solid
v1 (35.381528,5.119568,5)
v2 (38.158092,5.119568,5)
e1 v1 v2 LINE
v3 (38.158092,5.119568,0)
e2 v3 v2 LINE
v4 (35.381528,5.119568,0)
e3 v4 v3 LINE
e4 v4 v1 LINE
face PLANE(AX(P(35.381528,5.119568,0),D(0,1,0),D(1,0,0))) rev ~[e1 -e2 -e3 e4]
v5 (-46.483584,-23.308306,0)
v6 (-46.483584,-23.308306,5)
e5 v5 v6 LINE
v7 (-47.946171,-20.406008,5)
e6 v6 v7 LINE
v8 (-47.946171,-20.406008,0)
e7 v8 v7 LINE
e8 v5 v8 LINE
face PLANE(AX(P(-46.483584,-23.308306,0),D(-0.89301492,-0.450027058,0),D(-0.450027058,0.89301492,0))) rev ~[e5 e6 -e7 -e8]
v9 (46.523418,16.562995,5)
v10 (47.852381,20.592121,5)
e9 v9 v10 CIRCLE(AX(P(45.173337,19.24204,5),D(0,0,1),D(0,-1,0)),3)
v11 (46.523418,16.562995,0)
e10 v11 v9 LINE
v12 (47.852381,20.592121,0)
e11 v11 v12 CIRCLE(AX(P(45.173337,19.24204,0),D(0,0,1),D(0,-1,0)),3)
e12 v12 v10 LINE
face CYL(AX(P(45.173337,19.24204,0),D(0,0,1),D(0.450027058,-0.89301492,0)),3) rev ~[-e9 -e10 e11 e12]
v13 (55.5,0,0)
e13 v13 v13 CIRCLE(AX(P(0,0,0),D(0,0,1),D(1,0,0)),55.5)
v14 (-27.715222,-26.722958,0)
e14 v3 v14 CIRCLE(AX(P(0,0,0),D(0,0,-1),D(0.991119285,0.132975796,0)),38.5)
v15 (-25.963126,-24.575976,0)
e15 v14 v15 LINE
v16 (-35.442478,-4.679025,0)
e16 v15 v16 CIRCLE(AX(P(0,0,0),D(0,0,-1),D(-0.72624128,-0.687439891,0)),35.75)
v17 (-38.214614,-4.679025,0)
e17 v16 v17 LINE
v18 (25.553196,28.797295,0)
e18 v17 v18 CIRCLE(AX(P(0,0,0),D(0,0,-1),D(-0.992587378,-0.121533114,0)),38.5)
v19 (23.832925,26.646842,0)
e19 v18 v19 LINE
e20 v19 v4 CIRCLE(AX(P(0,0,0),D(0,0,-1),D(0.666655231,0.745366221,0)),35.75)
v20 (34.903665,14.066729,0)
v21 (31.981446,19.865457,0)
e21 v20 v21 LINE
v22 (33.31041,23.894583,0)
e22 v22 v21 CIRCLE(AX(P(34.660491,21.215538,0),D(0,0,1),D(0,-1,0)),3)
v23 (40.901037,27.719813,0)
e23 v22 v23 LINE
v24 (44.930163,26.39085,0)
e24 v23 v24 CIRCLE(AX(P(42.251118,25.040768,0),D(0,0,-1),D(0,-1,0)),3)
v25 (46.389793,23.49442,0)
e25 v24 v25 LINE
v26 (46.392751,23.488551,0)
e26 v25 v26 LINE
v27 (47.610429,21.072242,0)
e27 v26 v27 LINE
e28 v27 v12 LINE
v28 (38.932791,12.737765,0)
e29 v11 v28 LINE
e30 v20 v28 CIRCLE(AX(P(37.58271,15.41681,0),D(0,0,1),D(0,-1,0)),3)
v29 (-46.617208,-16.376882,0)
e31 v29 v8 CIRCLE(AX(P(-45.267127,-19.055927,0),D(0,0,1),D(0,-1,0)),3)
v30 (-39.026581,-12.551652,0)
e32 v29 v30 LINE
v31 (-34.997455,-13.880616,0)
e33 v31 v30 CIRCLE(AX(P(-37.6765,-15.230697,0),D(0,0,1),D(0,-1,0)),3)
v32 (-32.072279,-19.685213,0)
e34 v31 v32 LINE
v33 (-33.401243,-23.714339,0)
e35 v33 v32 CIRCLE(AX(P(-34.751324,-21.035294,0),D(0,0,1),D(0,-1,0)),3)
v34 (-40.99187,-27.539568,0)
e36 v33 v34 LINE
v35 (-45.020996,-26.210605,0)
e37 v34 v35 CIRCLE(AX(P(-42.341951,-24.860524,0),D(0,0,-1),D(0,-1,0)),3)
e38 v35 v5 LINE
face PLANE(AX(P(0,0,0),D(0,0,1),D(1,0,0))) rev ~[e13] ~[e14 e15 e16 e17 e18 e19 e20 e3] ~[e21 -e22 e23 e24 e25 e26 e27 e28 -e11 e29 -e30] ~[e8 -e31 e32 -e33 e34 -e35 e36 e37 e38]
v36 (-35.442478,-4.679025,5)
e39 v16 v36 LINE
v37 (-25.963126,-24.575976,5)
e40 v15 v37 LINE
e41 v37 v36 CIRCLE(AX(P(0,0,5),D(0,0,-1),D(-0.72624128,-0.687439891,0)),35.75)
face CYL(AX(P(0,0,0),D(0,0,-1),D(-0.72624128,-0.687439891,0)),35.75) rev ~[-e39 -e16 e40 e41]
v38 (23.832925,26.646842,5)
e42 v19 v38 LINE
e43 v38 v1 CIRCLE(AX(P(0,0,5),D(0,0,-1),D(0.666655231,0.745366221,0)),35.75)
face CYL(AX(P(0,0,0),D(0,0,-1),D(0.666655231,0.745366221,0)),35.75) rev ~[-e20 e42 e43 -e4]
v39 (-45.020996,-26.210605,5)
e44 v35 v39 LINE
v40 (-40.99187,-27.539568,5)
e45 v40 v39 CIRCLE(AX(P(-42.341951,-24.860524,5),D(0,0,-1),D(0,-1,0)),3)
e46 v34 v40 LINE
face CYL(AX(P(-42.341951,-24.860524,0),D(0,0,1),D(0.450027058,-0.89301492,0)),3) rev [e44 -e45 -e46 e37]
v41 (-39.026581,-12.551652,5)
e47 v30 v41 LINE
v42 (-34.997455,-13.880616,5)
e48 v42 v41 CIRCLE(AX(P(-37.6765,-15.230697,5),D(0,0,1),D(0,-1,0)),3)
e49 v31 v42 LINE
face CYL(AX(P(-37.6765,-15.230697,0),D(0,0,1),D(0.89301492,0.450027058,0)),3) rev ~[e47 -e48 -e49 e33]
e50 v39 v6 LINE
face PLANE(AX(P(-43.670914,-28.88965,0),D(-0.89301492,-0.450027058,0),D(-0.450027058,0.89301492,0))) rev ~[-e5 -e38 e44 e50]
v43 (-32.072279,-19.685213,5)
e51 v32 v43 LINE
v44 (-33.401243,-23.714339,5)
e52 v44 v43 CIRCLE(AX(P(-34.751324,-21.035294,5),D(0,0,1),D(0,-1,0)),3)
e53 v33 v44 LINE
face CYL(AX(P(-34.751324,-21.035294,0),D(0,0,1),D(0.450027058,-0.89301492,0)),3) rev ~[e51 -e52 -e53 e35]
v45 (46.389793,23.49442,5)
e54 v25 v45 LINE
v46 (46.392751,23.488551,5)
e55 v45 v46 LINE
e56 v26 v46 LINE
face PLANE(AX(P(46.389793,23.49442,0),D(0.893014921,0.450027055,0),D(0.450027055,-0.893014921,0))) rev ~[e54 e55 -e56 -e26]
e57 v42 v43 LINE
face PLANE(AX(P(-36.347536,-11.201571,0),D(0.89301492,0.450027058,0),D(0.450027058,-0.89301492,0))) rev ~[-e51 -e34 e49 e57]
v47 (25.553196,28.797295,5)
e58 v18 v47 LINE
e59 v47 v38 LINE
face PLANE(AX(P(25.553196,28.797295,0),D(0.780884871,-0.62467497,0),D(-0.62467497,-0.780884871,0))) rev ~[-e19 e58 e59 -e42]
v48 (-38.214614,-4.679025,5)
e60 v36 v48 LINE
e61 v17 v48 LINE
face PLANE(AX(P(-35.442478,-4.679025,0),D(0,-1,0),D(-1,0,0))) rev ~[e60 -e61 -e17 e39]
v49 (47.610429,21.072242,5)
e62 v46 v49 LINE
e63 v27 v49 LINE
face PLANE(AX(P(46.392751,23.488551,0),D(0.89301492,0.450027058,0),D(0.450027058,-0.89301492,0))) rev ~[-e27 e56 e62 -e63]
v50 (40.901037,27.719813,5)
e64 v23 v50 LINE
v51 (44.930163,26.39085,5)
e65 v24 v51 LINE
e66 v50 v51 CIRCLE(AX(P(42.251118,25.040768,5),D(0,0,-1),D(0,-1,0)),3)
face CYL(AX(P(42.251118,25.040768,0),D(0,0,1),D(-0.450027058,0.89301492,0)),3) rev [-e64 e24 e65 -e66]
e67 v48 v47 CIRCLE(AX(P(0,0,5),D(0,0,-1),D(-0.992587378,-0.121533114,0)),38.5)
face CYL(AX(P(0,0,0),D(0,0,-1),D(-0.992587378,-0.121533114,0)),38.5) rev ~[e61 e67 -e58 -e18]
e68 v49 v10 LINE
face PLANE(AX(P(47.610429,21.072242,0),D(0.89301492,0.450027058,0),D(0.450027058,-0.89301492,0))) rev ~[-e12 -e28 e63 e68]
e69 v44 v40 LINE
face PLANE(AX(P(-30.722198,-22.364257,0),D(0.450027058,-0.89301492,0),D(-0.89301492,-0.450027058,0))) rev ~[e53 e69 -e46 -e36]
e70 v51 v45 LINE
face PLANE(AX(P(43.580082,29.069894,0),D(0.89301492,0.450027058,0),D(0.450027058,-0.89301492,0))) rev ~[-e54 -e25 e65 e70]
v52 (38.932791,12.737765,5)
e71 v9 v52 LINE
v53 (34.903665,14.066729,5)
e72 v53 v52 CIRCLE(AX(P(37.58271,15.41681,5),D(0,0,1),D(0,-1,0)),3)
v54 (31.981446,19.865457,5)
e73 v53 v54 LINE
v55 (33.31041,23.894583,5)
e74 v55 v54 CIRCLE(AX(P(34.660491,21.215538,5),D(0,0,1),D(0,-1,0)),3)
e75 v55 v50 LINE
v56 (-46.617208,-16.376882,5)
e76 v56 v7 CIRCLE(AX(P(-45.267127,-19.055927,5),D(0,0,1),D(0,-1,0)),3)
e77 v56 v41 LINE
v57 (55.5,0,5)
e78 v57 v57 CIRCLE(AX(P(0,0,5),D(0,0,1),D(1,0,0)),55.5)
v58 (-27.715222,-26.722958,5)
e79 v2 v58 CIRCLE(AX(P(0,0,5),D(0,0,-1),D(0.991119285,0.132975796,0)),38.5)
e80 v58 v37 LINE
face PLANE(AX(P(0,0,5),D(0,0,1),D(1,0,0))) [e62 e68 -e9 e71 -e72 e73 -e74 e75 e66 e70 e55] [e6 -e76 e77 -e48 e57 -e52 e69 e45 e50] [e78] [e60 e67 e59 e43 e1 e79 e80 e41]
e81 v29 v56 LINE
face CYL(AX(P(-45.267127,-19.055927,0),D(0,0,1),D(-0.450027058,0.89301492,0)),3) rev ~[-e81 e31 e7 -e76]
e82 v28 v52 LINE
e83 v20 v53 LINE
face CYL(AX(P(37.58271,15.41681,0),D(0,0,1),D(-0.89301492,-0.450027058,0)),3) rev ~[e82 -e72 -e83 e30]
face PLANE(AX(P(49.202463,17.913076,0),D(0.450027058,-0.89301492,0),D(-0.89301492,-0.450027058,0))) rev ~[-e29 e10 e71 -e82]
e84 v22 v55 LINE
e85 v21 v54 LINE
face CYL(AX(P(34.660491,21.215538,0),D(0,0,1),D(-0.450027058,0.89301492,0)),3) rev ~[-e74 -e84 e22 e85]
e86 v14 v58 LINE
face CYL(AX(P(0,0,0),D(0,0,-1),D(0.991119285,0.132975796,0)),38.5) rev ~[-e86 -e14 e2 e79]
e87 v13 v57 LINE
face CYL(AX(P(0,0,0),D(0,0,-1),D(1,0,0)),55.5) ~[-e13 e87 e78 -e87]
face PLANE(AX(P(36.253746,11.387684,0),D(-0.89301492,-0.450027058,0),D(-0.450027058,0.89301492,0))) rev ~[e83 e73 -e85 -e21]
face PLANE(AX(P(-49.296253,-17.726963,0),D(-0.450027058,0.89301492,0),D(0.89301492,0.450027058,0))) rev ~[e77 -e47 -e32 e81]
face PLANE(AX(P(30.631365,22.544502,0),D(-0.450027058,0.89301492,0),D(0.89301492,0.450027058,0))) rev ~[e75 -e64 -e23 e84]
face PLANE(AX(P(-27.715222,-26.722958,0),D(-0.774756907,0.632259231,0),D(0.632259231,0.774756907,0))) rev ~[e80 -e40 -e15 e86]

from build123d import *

# Parameters (mm, degrees)
F0_R     = 55.5
F1_DEPTH = 5
F2_R     = 3


with BuildPart() as f1:
    # F0 (on Top) → F1 (new body)
    with BuildSketch(Plane.XY):
        Circle(F0_R)
        Polygon((-43.6709144021, -28.8896496715), (-46.4835835158, -23.3083064231), (-49.2962526295, -17.7269631746), (-36.3475362931, -11.2015708309), (-30.7221980657, -22.3642573278), align=None, mode=Mode.SUBTRACT)
        with BuildLine():
            ThreePointArc((-25.9631257504, -24.5759761), (-32.2743582607, -15.3762251173), (-35.4424777104, -4.6790248716))
            Line((-35.4424777104, -4.6790248716), (-38.2146140403, -4.6790248716))
            ThreePointArc((-38.2146140403, -4.6790248716), (-17.8953589694, 34.0882109733), (25.553195754, 28.797294782))
            Line((25.553195754, 28.797294782), (23.8329245146, 26.6468423848))
            ThreePointArc((23.8329245146, 26.6468423848), (31.5030749277, 16.9002594685), (35.381527976, 5.1195681537))
            Line((35.381527976, 5.1195681537), (38.1580924827, 5.1195681537))
            ThreePointArc((38.1580924827, 5.1195681537), (16.7555959393, -34.6626600929), (-27.7152221959, -26.7229575203))
            Line((-27.7152221959, -26.7229575203), (-25.9631257504, -24.5759761))
        make_face(mode=Mode.SUBTRACT)
        Polygon((43.5800816552, 29.0698943851), (46.3897934183, 23.4944195798), (46.3927507689, 23.4885511366), (47.6104286529, 21.0722419435), (49.2024625319, 17.9130763314), (36.2537461955, 11.3876839877), (30.6313653188, 22.5445020413), align=None, mode=Mode.SUBTRACT)
    extrude(amount=F1_DEPTH)

    # F2
    f2_edges = [f1.edges().sort_by_distance(p)[0] for p in [
        (-36.347536, -11.201571, 2.5),
        (-49.296253, -17.726963, 2.5),
        (-30.722198, -22.364257, 2.5),
        (-43.670914, -28.88965, 2.5),
        (36.253746, 11.387684, 2.5),
        (30.631365, 22.544502, 2.5),
        (43.580082, 29.069894, 2.5),
        (49.202463, 17.913076, 2.5),
    ]]
    fillet(f2_edges, radius=F2_R)


solid = f1.part
